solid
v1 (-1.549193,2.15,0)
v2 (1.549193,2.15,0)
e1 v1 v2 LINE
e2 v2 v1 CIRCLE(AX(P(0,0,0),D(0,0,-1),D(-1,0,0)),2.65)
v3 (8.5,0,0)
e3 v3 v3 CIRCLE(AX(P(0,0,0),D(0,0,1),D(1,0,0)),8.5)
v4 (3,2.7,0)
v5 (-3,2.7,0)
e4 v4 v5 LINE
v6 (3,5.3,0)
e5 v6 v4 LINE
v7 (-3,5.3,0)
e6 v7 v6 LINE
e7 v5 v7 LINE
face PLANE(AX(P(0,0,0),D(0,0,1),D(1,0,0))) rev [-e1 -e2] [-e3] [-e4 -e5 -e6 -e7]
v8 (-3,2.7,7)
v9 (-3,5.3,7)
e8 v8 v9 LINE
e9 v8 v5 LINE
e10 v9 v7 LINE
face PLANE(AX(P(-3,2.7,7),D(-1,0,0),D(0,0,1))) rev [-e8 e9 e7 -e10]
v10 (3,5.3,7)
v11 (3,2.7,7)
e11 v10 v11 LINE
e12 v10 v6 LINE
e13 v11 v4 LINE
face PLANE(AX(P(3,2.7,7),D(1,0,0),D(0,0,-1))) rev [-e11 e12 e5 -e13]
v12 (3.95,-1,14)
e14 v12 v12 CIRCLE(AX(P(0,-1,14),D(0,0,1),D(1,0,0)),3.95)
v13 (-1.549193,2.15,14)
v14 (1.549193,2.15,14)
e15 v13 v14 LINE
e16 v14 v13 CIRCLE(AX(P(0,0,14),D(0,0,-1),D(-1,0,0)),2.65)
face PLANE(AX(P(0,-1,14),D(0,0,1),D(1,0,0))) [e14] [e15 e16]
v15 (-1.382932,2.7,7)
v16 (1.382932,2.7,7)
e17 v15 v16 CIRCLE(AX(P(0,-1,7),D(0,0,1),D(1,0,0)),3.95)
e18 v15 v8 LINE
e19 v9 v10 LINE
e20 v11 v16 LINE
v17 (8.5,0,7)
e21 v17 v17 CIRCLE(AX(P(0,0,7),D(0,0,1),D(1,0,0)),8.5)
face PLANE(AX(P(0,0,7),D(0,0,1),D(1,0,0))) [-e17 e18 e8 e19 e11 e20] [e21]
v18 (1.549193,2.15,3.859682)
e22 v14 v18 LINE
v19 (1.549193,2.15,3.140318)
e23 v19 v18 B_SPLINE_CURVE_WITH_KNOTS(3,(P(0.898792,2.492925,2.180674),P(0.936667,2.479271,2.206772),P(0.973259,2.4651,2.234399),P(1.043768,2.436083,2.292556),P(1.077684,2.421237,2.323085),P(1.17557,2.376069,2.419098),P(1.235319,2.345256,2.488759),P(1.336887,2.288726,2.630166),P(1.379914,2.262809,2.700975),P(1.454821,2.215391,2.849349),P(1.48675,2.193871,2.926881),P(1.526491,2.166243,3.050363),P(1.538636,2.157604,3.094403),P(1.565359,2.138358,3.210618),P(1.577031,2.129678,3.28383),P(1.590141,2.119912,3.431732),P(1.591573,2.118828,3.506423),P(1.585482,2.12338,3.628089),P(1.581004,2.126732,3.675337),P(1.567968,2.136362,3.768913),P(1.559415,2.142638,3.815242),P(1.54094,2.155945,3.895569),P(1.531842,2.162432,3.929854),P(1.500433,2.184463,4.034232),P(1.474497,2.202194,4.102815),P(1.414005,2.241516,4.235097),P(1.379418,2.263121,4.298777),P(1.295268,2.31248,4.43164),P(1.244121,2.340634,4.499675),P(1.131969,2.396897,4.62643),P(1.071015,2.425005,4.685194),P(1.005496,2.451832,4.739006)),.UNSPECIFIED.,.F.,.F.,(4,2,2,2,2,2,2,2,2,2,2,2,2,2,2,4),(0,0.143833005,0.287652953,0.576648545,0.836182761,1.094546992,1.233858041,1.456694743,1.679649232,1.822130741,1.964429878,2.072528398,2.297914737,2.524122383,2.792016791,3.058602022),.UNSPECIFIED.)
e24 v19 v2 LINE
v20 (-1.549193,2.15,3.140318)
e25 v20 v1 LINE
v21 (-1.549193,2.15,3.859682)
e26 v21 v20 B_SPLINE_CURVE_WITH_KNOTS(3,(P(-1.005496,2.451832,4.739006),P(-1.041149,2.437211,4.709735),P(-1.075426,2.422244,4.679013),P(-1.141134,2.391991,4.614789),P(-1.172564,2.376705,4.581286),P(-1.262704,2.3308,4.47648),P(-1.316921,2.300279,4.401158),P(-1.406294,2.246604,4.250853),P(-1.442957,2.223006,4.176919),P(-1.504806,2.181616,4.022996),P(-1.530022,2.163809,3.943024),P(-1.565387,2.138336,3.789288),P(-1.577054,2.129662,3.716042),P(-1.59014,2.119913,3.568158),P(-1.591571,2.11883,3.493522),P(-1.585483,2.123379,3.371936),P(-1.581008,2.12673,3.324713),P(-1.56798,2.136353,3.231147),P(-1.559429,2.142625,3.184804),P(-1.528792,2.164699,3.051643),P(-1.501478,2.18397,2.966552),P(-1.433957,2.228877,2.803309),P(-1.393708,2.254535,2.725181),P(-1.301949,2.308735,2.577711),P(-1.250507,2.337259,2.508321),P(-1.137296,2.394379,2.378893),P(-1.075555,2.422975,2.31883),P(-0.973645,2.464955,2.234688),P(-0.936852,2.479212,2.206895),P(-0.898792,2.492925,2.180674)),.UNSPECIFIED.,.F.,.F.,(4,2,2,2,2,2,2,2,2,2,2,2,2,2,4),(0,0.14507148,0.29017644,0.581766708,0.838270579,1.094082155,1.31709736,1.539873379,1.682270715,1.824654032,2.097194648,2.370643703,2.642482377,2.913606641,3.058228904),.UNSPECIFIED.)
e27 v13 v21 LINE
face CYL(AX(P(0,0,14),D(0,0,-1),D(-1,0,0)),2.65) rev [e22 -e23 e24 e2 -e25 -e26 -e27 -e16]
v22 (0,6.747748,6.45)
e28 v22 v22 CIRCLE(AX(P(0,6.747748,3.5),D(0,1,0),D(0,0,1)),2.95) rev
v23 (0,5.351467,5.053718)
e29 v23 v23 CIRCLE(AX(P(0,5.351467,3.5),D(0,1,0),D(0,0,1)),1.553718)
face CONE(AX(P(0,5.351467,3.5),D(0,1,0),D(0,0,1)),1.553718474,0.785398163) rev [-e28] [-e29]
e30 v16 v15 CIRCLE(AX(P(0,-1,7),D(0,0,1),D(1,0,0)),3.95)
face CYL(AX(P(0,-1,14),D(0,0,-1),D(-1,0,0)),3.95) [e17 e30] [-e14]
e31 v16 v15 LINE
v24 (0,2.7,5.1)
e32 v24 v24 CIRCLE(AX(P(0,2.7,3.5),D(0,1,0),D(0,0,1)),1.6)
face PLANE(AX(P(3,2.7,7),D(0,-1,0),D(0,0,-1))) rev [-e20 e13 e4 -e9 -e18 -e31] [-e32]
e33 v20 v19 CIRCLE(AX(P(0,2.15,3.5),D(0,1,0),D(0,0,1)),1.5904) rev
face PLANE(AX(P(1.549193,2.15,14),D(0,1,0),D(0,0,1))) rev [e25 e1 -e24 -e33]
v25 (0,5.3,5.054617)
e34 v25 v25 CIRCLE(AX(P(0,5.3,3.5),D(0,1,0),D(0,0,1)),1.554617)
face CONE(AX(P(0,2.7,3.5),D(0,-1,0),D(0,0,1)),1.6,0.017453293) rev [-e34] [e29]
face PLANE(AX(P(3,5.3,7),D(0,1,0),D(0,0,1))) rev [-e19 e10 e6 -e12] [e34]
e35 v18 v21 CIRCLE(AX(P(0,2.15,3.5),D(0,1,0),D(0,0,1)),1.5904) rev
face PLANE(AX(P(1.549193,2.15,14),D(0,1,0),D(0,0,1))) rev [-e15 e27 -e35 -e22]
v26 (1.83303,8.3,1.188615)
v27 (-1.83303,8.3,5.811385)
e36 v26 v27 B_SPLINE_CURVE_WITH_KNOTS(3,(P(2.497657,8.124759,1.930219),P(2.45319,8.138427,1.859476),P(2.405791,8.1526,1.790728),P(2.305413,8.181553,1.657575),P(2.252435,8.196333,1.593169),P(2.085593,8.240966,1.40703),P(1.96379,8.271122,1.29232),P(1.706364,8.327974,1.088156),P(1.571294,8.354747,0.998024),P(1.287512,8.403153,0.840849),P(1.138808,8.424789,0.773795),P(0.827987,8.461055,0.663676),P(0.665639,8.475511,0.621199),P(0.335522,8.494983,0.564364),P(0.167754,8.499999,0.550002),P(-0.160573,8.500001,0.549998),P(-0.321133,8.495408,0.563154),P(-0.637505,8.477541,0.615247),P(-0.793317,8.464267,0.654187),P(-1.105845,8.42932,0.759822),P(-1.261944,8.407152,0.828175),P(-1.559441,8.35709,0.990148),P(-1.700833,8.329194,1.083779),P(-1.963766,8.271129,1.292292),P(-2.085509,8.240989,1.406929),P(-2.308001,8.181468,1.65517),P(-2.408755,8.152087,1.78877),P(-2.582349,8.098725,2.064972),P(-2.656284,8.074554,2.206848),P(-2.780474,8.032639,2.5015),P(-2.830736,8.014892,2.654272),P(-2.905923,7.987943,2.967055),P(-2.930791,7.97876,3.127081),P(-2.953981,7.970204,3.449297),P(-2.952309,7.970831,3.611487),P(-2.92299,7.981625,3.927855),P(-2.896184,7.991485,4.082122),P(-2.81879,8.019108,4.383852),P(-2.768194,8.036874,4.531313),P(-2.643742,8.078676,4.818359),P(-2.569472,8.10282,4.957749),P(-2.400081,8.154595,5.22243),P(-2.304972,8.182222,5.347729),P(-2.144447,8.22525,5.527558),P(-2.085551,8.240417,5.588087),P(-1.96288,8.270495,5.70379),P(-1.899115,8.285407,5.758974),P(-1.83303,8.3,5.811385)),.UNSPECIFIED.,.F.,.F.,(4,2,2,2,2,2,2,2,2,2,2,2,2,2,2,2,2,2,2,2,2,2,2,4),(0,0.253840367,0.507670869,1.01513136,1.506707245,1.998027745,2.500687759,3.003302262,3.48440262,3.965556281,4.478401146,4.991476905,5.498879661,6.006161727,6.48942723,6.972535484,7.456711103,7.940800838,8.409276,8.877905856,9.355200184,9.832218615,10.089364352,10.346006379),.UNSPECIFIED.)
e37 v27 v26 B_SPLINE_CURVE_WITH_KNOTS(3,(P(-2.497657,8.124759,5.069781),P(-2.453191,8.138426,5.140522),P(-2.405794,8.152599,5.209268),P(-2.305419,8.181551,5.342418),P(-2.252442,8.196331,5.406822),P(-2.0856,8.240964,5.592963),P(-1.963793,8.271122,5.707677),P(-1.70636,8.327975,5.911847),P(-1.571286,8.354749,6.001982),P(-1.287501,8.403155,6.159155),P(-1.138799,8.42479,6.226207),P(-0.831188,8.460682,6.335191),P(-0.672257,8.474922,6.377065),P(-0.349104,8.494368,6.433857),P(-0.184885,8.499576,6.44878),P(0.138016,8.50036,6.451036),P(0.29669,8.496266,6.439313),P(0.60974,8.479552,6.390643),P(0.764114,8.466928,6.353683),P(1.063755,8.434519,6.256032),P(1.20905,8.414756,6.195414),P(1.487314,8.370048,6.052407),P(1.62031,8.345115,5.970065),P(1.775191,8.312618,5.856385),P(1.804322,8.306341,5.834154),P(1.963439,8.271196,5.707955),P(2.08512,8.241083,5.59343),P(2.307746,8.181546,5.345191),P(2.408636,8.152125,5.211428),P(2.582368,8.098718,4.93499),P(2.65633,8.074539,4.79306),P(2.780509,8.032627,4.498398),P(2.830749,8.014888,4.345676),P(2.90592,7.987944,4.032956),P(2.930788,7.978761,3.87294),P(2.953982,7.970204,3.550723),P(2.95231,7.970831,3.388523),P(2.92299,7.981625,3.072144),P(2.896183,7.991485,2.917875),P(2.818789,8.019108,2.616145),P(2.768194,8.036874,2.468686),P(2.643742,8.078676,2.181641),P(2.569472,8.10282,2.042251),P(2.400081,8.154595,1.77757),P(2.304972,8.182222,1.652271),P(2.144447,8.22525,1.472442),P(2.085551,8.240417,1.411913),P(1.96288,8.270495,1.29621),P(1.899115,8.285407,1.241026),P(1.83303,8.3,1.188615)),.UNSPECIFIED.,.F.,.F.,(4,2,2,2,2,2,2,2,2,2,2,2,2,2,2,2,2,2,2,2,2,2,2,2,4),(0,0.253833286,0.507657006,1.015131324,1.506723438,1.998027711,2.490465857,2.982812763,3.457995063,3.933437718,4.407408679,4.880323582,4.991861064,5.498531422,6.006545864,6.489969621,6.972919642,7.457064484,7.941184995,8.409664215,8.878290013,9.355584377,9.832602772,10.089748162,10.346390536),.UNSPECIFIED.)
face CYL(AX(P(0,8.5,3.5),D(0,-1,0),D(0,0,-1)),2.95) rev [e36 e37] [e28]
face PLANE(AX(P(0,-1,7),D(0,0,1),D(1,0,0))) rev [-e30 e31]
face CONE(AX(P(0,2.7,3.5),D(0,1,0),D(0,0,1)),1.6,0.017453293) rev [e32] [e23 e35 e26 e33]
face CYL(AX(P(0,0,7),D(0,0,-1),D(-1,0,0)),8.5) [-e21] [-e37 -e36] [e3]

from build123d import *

# Parameters (mm, degrees)
ESQUISSE1_R             = 8.5
BOSS_EXTRU_1_DEPTH      = 7
ESQUISSE2_W             = 6
ESQUISSE2_H             = 2.6
ENL_V_MAT_EXTRU_1_DEPTH = 14.910427743
ESQUISSE7_R             = 2.95
ENL_V_MAT_EXTRU_8_DEPTH = 21.087060672
ESQUISSE9_R             = 3.95
BOSS_EXTRU_2_DEPTH      = 7
ENL_V_MAT_EXTRU_9_DEPTH = 19.45264218


with BuildPart() as part:
    # Esquisse1 → Boss.-Extru.1 (new body)
    with BuildSketch(Plane.XY):
        Circle(ESQUISSE1_R)
    extrude(amount=BOSS_EXTRU_1_DEPTH)

    # Esquisse2 → Enlèv. mat.-Extru.1 (cut, through all)
    with BuildSketch(Plane(origin=(0, 0, 0), x_dir=(-1, 0, 0), z_dir=(0, 0, -1))):
        with Locations((0, 4)):
            Rectangle(ESQUISSE2_W, ESQUISSE2_H)
    extrude(amount=-ENL_V_MAT_EXTRU_1_DEPTH, mode=Mode.SUBTRACT)

    # Enlèv. mat.-Extru.2: read off the stored shape, not the designer's step
    # Enlèv. mat.-Extru.2 outline → Enlèv. mat.-Extru.2 (revolve, cut)
    with BuildSketch(Plane.XY.offset(3.5)):
        Polygon((0, 5.3), (1.554616831, 5.3), (1.498760014, 8.500034923), (0, 8.500034923), align=None)
        Polygon((1.6, 2.7), (0, 2.7), (0, 0.7), (1.56508987, 0.7), align=None)
    revolve(axis=Axis((0, 0, 3.5), (0, 1, 0)), mode=Mode.SUBTRACT)

    # Esquisse7 → Enlèv. mat.-Extru.8 (cut, through all)
    with BuildSketch(Plane(origin=(0, 8.3, 0), x_dir=(1, 0, 0), z_dir=(0, 1, 0))):
        with Locations((0, -3.5)):
            Circle(ESQUISSE7_R)
    extrude(amount=ENL_V_MAT_EXTRU_8_DEPTH, mode=Mode.SUBTRACT)

    # Chanfrein1: read off the stored shape, not the designer's step
    # Chanfrein1 outline → Chanfrein1 (revolve, cut)
    with BuildSketch(Plane.XY.offset(3.5)):
        Polygon((2.95, 6.747748364), (2.95, 8.3), (1.502251636, 8.3), (1.553718474, 5.351466838), align=None)
    revolve(axis=Axis((0, 0, 3.5), (0, 1, 0)), mode=Mode.SUBTRACT)

    # Esquisse9 → Boss.-Extru.2 (add)
    with BuildSketch(Plane.XY.offset(7)):
        with Locations(Location((0, -1, 0), (0, 0, 110.493999506))):
            Circle(ESQUISSE9_R)
    extrude(amount=BOSS_EXTRU_2_DEPTH)

    # Esquisse10 → Enlèv. mat.-Extru.9 (cut, through all)
    with BuildSketch(Plane(origin=(0, 0, 0), x_dir=(-1, 0, 0), z_dir=(0, 0, -1))):
        with BuildLine():
            Line((-1.549193338, 2.15), (1.549193338, 2.15))
            ThreePointArc((1.549193338, 2.15), (0, -2.65), (-1.549193338, 2.15))
        make_face()
    extrude(amount=-ENL_V_MAT_EXTRU_9_DEPTH, mode=Mode.SUBTRACT)


solid = part.part
